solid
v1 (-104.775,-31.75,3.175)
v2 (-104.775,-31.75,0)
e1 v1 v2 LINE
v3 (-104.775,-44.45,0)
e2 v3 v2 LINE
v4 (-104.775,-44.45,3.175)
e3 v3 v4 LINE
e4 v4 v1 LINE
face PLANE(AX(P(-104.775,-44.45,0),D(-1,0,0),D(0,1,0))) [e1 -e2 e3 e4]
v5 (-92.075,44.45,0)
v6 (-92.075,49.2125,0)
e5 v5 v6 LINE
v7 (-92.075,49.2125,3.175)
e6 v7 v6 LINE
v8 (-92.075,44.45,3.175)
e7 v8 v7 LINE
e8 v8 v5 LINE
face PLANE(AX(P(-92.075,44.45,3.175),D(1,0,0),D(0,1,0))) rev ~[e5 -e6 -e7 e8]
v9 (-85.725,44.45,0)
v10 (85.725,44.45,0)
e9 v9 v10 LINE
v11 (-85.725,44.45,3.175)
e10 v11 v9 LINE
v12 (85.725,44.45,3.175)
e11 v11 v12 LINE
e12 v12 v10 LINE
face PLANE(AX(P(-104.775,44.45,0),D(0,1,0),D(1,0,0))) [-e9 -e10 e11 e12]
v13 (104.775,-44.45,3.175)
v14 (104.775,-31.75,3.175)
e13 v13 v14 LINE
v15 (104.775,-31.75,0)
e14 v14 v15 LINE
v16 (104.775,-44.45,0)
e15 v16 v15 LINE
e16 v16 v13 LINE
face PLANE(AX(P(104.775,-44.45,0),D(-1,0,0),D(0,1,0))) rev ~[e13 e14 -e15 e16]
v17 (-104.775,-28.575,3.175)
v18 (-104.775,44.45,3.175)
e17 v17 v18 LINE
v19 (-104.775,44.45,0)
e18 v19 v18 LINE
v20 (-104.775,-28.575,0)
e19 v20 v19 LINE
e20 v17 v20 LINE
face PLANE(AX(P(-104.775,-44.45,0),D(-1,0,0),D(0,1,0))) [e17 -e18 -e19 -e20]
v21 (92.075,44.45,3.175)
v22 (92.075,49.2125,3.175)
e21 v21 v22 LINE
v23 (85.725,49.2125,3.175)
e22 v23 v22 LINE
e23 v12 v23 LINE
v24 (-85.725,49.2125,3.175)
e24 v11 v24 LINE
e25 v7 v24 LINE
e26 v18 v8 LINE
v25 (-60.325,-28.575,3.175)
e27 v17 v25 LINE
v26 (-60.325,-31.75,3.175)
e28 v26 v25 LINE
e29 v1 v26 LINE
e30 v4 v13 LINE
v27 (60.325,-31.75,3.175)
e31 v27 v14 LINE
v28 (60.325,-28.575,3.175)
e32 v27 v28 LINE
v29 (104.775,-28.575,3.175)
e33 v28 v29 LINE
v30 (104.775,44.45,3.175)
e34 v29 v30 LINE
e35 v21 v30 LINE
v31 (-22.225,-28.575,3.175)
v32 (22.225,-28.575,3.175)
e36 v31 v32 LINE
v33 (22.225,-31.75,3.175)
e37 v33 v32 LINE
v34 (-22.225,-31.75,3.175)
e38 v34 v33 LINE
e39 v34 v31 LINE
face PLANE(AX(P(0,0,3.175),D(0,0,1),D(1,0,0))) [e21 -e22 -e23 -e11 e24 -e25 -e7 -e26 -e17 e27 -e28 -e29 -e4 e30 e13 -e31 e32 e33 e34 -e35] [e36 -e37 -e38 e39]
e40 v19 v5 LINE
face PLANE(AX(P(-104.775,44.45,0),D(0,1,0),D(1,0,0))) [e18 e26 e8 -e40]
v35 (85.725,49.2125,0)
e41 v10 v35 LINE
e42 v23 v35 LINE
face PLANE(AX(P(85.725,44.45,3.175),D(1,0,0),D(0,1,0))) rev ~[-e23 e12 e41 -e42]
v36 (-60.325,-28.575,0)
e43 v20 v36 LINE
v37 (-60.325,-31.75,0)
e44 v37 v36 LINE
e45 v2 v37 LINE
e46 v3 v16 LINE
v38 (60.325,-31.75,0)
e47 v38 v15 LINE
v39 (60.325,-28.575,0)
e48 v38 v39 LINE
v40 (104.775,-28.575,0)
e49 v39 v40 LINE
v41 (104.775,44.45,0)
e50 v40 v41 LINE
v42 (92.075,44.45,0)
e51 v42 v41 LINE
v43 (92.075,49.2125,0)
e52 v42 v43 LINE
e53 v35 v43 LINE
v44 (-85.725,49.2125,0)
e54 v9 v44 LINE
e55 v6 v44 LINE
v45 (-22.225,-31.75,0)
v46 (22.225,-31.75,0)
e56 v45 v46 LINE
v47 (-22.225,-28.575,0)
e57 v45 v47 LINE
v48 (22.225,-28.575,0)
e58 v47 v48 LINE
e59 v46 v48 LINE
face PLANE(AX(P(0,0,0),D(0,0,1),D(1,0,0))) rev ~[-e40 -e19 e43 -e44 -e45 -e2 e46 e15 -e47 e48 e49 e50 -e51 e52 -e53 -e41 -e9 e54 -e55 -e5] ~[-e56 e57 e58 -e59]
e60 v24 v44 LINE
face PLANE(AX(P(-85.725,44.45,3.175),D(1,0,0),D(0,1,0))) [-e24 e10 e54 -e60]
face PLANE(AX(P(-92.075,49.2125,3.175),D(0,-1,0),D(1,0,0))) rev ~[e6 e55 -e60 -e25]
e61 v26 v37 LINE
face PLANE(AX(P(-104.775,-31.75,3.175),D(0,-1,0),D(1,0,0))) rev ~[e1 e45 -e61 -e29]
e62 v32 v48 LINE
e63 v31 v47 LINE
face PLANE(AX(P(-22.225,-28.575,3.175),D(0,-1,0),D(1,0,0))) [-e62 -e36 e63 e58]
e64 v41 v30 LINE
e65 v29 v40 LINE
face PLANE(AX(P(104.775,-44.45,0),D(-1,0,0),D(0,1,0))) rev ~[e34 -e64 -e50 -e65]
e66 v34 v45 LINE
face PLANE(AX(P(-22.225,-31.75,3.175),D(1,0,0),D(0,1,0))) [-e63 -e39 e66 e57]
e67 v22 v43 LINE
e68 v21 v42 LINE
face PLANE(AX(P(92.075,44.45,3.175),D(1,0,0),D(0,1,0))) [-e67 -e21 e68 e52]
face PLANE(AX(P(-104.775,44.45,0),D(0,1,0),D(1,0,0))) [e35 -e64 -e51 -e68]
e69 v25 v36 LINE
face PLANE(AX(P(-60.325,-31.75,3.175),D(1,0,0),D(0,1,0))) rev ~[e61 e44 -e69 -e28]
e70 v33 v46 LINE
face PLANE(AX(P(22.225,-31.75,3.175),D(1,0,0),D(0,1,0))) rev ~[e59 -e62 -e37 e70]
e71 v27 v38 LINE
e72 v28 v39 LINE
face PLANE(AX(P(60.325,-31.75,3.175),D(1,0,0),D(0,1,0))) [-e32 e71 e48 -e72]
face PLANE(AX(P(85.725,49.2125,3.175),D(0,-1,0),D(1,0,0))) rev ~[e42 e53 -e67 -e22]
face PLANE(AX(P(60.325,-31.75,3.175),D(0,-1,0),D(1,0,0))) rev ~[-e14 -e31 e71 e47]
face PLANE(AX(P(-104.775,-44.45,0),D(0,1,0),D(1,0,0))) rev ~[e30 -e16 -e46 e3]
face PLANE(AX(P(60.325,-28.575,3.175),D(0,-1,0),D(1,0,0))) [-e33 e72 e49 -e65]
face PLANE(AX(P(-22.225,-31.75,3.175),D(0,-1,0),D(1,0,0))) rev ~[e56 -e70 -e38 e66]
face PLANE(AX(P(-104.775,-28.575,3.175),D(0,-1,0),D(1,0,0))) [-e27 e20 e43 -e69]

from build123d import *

# Parameters (mm, degrees)
F0_W     = 209.55
F0_H     = 88.9
F1_DEPTH = 3.175
F2_W     = 44.45
F2_H     = 3.175
F3_DEPTH = 25.4
F4_W     = 6.35
F4_H     = 4.7625
F5_DEPTH = 3.175


# Not quite as in the source:
# - a length typed as a fraction of an inch, garbled in the dataset ("3 / 203.2 mm" for 3/8 in), is restored


with BuildPart() as f1:
    # F0 (on Top) → F1 (new body)
    with BuildSketch(Plane.XY):
        Rectangle(F0_W, F0_H)
    extrude(amount=F1_DEPTH)

    # F2 (on face) → F3 (cut)
    with BuildSketch(Plane.XY.offset(3.175)):
        with Locations((-82.55, -30.1625)):
            Rectangle(F2_W, F2_H)
        with Locations((82.55, -30.1625)):
            Rectangle(F2_W, F2_H)
        with Locations((0, -30.1625)):
            Rectangle(F2_W, F2_H)
    extrude(amount=-F3_DEPTH, mode=Mode.SUBTRACT)

    # F4 (on face) → F5 (join)
    with BuildSketch(Plane.XY.offset(3.175)):
        with Locations((-88.9, 46.83125)):
            Rectangle(F4_W, F4_H)
        with Locations((88.9, 46.83125)):
            Rectangle(F4_W, F4_H)
    extrude(amount=-F5_DEPTH)


solid = f1.part
